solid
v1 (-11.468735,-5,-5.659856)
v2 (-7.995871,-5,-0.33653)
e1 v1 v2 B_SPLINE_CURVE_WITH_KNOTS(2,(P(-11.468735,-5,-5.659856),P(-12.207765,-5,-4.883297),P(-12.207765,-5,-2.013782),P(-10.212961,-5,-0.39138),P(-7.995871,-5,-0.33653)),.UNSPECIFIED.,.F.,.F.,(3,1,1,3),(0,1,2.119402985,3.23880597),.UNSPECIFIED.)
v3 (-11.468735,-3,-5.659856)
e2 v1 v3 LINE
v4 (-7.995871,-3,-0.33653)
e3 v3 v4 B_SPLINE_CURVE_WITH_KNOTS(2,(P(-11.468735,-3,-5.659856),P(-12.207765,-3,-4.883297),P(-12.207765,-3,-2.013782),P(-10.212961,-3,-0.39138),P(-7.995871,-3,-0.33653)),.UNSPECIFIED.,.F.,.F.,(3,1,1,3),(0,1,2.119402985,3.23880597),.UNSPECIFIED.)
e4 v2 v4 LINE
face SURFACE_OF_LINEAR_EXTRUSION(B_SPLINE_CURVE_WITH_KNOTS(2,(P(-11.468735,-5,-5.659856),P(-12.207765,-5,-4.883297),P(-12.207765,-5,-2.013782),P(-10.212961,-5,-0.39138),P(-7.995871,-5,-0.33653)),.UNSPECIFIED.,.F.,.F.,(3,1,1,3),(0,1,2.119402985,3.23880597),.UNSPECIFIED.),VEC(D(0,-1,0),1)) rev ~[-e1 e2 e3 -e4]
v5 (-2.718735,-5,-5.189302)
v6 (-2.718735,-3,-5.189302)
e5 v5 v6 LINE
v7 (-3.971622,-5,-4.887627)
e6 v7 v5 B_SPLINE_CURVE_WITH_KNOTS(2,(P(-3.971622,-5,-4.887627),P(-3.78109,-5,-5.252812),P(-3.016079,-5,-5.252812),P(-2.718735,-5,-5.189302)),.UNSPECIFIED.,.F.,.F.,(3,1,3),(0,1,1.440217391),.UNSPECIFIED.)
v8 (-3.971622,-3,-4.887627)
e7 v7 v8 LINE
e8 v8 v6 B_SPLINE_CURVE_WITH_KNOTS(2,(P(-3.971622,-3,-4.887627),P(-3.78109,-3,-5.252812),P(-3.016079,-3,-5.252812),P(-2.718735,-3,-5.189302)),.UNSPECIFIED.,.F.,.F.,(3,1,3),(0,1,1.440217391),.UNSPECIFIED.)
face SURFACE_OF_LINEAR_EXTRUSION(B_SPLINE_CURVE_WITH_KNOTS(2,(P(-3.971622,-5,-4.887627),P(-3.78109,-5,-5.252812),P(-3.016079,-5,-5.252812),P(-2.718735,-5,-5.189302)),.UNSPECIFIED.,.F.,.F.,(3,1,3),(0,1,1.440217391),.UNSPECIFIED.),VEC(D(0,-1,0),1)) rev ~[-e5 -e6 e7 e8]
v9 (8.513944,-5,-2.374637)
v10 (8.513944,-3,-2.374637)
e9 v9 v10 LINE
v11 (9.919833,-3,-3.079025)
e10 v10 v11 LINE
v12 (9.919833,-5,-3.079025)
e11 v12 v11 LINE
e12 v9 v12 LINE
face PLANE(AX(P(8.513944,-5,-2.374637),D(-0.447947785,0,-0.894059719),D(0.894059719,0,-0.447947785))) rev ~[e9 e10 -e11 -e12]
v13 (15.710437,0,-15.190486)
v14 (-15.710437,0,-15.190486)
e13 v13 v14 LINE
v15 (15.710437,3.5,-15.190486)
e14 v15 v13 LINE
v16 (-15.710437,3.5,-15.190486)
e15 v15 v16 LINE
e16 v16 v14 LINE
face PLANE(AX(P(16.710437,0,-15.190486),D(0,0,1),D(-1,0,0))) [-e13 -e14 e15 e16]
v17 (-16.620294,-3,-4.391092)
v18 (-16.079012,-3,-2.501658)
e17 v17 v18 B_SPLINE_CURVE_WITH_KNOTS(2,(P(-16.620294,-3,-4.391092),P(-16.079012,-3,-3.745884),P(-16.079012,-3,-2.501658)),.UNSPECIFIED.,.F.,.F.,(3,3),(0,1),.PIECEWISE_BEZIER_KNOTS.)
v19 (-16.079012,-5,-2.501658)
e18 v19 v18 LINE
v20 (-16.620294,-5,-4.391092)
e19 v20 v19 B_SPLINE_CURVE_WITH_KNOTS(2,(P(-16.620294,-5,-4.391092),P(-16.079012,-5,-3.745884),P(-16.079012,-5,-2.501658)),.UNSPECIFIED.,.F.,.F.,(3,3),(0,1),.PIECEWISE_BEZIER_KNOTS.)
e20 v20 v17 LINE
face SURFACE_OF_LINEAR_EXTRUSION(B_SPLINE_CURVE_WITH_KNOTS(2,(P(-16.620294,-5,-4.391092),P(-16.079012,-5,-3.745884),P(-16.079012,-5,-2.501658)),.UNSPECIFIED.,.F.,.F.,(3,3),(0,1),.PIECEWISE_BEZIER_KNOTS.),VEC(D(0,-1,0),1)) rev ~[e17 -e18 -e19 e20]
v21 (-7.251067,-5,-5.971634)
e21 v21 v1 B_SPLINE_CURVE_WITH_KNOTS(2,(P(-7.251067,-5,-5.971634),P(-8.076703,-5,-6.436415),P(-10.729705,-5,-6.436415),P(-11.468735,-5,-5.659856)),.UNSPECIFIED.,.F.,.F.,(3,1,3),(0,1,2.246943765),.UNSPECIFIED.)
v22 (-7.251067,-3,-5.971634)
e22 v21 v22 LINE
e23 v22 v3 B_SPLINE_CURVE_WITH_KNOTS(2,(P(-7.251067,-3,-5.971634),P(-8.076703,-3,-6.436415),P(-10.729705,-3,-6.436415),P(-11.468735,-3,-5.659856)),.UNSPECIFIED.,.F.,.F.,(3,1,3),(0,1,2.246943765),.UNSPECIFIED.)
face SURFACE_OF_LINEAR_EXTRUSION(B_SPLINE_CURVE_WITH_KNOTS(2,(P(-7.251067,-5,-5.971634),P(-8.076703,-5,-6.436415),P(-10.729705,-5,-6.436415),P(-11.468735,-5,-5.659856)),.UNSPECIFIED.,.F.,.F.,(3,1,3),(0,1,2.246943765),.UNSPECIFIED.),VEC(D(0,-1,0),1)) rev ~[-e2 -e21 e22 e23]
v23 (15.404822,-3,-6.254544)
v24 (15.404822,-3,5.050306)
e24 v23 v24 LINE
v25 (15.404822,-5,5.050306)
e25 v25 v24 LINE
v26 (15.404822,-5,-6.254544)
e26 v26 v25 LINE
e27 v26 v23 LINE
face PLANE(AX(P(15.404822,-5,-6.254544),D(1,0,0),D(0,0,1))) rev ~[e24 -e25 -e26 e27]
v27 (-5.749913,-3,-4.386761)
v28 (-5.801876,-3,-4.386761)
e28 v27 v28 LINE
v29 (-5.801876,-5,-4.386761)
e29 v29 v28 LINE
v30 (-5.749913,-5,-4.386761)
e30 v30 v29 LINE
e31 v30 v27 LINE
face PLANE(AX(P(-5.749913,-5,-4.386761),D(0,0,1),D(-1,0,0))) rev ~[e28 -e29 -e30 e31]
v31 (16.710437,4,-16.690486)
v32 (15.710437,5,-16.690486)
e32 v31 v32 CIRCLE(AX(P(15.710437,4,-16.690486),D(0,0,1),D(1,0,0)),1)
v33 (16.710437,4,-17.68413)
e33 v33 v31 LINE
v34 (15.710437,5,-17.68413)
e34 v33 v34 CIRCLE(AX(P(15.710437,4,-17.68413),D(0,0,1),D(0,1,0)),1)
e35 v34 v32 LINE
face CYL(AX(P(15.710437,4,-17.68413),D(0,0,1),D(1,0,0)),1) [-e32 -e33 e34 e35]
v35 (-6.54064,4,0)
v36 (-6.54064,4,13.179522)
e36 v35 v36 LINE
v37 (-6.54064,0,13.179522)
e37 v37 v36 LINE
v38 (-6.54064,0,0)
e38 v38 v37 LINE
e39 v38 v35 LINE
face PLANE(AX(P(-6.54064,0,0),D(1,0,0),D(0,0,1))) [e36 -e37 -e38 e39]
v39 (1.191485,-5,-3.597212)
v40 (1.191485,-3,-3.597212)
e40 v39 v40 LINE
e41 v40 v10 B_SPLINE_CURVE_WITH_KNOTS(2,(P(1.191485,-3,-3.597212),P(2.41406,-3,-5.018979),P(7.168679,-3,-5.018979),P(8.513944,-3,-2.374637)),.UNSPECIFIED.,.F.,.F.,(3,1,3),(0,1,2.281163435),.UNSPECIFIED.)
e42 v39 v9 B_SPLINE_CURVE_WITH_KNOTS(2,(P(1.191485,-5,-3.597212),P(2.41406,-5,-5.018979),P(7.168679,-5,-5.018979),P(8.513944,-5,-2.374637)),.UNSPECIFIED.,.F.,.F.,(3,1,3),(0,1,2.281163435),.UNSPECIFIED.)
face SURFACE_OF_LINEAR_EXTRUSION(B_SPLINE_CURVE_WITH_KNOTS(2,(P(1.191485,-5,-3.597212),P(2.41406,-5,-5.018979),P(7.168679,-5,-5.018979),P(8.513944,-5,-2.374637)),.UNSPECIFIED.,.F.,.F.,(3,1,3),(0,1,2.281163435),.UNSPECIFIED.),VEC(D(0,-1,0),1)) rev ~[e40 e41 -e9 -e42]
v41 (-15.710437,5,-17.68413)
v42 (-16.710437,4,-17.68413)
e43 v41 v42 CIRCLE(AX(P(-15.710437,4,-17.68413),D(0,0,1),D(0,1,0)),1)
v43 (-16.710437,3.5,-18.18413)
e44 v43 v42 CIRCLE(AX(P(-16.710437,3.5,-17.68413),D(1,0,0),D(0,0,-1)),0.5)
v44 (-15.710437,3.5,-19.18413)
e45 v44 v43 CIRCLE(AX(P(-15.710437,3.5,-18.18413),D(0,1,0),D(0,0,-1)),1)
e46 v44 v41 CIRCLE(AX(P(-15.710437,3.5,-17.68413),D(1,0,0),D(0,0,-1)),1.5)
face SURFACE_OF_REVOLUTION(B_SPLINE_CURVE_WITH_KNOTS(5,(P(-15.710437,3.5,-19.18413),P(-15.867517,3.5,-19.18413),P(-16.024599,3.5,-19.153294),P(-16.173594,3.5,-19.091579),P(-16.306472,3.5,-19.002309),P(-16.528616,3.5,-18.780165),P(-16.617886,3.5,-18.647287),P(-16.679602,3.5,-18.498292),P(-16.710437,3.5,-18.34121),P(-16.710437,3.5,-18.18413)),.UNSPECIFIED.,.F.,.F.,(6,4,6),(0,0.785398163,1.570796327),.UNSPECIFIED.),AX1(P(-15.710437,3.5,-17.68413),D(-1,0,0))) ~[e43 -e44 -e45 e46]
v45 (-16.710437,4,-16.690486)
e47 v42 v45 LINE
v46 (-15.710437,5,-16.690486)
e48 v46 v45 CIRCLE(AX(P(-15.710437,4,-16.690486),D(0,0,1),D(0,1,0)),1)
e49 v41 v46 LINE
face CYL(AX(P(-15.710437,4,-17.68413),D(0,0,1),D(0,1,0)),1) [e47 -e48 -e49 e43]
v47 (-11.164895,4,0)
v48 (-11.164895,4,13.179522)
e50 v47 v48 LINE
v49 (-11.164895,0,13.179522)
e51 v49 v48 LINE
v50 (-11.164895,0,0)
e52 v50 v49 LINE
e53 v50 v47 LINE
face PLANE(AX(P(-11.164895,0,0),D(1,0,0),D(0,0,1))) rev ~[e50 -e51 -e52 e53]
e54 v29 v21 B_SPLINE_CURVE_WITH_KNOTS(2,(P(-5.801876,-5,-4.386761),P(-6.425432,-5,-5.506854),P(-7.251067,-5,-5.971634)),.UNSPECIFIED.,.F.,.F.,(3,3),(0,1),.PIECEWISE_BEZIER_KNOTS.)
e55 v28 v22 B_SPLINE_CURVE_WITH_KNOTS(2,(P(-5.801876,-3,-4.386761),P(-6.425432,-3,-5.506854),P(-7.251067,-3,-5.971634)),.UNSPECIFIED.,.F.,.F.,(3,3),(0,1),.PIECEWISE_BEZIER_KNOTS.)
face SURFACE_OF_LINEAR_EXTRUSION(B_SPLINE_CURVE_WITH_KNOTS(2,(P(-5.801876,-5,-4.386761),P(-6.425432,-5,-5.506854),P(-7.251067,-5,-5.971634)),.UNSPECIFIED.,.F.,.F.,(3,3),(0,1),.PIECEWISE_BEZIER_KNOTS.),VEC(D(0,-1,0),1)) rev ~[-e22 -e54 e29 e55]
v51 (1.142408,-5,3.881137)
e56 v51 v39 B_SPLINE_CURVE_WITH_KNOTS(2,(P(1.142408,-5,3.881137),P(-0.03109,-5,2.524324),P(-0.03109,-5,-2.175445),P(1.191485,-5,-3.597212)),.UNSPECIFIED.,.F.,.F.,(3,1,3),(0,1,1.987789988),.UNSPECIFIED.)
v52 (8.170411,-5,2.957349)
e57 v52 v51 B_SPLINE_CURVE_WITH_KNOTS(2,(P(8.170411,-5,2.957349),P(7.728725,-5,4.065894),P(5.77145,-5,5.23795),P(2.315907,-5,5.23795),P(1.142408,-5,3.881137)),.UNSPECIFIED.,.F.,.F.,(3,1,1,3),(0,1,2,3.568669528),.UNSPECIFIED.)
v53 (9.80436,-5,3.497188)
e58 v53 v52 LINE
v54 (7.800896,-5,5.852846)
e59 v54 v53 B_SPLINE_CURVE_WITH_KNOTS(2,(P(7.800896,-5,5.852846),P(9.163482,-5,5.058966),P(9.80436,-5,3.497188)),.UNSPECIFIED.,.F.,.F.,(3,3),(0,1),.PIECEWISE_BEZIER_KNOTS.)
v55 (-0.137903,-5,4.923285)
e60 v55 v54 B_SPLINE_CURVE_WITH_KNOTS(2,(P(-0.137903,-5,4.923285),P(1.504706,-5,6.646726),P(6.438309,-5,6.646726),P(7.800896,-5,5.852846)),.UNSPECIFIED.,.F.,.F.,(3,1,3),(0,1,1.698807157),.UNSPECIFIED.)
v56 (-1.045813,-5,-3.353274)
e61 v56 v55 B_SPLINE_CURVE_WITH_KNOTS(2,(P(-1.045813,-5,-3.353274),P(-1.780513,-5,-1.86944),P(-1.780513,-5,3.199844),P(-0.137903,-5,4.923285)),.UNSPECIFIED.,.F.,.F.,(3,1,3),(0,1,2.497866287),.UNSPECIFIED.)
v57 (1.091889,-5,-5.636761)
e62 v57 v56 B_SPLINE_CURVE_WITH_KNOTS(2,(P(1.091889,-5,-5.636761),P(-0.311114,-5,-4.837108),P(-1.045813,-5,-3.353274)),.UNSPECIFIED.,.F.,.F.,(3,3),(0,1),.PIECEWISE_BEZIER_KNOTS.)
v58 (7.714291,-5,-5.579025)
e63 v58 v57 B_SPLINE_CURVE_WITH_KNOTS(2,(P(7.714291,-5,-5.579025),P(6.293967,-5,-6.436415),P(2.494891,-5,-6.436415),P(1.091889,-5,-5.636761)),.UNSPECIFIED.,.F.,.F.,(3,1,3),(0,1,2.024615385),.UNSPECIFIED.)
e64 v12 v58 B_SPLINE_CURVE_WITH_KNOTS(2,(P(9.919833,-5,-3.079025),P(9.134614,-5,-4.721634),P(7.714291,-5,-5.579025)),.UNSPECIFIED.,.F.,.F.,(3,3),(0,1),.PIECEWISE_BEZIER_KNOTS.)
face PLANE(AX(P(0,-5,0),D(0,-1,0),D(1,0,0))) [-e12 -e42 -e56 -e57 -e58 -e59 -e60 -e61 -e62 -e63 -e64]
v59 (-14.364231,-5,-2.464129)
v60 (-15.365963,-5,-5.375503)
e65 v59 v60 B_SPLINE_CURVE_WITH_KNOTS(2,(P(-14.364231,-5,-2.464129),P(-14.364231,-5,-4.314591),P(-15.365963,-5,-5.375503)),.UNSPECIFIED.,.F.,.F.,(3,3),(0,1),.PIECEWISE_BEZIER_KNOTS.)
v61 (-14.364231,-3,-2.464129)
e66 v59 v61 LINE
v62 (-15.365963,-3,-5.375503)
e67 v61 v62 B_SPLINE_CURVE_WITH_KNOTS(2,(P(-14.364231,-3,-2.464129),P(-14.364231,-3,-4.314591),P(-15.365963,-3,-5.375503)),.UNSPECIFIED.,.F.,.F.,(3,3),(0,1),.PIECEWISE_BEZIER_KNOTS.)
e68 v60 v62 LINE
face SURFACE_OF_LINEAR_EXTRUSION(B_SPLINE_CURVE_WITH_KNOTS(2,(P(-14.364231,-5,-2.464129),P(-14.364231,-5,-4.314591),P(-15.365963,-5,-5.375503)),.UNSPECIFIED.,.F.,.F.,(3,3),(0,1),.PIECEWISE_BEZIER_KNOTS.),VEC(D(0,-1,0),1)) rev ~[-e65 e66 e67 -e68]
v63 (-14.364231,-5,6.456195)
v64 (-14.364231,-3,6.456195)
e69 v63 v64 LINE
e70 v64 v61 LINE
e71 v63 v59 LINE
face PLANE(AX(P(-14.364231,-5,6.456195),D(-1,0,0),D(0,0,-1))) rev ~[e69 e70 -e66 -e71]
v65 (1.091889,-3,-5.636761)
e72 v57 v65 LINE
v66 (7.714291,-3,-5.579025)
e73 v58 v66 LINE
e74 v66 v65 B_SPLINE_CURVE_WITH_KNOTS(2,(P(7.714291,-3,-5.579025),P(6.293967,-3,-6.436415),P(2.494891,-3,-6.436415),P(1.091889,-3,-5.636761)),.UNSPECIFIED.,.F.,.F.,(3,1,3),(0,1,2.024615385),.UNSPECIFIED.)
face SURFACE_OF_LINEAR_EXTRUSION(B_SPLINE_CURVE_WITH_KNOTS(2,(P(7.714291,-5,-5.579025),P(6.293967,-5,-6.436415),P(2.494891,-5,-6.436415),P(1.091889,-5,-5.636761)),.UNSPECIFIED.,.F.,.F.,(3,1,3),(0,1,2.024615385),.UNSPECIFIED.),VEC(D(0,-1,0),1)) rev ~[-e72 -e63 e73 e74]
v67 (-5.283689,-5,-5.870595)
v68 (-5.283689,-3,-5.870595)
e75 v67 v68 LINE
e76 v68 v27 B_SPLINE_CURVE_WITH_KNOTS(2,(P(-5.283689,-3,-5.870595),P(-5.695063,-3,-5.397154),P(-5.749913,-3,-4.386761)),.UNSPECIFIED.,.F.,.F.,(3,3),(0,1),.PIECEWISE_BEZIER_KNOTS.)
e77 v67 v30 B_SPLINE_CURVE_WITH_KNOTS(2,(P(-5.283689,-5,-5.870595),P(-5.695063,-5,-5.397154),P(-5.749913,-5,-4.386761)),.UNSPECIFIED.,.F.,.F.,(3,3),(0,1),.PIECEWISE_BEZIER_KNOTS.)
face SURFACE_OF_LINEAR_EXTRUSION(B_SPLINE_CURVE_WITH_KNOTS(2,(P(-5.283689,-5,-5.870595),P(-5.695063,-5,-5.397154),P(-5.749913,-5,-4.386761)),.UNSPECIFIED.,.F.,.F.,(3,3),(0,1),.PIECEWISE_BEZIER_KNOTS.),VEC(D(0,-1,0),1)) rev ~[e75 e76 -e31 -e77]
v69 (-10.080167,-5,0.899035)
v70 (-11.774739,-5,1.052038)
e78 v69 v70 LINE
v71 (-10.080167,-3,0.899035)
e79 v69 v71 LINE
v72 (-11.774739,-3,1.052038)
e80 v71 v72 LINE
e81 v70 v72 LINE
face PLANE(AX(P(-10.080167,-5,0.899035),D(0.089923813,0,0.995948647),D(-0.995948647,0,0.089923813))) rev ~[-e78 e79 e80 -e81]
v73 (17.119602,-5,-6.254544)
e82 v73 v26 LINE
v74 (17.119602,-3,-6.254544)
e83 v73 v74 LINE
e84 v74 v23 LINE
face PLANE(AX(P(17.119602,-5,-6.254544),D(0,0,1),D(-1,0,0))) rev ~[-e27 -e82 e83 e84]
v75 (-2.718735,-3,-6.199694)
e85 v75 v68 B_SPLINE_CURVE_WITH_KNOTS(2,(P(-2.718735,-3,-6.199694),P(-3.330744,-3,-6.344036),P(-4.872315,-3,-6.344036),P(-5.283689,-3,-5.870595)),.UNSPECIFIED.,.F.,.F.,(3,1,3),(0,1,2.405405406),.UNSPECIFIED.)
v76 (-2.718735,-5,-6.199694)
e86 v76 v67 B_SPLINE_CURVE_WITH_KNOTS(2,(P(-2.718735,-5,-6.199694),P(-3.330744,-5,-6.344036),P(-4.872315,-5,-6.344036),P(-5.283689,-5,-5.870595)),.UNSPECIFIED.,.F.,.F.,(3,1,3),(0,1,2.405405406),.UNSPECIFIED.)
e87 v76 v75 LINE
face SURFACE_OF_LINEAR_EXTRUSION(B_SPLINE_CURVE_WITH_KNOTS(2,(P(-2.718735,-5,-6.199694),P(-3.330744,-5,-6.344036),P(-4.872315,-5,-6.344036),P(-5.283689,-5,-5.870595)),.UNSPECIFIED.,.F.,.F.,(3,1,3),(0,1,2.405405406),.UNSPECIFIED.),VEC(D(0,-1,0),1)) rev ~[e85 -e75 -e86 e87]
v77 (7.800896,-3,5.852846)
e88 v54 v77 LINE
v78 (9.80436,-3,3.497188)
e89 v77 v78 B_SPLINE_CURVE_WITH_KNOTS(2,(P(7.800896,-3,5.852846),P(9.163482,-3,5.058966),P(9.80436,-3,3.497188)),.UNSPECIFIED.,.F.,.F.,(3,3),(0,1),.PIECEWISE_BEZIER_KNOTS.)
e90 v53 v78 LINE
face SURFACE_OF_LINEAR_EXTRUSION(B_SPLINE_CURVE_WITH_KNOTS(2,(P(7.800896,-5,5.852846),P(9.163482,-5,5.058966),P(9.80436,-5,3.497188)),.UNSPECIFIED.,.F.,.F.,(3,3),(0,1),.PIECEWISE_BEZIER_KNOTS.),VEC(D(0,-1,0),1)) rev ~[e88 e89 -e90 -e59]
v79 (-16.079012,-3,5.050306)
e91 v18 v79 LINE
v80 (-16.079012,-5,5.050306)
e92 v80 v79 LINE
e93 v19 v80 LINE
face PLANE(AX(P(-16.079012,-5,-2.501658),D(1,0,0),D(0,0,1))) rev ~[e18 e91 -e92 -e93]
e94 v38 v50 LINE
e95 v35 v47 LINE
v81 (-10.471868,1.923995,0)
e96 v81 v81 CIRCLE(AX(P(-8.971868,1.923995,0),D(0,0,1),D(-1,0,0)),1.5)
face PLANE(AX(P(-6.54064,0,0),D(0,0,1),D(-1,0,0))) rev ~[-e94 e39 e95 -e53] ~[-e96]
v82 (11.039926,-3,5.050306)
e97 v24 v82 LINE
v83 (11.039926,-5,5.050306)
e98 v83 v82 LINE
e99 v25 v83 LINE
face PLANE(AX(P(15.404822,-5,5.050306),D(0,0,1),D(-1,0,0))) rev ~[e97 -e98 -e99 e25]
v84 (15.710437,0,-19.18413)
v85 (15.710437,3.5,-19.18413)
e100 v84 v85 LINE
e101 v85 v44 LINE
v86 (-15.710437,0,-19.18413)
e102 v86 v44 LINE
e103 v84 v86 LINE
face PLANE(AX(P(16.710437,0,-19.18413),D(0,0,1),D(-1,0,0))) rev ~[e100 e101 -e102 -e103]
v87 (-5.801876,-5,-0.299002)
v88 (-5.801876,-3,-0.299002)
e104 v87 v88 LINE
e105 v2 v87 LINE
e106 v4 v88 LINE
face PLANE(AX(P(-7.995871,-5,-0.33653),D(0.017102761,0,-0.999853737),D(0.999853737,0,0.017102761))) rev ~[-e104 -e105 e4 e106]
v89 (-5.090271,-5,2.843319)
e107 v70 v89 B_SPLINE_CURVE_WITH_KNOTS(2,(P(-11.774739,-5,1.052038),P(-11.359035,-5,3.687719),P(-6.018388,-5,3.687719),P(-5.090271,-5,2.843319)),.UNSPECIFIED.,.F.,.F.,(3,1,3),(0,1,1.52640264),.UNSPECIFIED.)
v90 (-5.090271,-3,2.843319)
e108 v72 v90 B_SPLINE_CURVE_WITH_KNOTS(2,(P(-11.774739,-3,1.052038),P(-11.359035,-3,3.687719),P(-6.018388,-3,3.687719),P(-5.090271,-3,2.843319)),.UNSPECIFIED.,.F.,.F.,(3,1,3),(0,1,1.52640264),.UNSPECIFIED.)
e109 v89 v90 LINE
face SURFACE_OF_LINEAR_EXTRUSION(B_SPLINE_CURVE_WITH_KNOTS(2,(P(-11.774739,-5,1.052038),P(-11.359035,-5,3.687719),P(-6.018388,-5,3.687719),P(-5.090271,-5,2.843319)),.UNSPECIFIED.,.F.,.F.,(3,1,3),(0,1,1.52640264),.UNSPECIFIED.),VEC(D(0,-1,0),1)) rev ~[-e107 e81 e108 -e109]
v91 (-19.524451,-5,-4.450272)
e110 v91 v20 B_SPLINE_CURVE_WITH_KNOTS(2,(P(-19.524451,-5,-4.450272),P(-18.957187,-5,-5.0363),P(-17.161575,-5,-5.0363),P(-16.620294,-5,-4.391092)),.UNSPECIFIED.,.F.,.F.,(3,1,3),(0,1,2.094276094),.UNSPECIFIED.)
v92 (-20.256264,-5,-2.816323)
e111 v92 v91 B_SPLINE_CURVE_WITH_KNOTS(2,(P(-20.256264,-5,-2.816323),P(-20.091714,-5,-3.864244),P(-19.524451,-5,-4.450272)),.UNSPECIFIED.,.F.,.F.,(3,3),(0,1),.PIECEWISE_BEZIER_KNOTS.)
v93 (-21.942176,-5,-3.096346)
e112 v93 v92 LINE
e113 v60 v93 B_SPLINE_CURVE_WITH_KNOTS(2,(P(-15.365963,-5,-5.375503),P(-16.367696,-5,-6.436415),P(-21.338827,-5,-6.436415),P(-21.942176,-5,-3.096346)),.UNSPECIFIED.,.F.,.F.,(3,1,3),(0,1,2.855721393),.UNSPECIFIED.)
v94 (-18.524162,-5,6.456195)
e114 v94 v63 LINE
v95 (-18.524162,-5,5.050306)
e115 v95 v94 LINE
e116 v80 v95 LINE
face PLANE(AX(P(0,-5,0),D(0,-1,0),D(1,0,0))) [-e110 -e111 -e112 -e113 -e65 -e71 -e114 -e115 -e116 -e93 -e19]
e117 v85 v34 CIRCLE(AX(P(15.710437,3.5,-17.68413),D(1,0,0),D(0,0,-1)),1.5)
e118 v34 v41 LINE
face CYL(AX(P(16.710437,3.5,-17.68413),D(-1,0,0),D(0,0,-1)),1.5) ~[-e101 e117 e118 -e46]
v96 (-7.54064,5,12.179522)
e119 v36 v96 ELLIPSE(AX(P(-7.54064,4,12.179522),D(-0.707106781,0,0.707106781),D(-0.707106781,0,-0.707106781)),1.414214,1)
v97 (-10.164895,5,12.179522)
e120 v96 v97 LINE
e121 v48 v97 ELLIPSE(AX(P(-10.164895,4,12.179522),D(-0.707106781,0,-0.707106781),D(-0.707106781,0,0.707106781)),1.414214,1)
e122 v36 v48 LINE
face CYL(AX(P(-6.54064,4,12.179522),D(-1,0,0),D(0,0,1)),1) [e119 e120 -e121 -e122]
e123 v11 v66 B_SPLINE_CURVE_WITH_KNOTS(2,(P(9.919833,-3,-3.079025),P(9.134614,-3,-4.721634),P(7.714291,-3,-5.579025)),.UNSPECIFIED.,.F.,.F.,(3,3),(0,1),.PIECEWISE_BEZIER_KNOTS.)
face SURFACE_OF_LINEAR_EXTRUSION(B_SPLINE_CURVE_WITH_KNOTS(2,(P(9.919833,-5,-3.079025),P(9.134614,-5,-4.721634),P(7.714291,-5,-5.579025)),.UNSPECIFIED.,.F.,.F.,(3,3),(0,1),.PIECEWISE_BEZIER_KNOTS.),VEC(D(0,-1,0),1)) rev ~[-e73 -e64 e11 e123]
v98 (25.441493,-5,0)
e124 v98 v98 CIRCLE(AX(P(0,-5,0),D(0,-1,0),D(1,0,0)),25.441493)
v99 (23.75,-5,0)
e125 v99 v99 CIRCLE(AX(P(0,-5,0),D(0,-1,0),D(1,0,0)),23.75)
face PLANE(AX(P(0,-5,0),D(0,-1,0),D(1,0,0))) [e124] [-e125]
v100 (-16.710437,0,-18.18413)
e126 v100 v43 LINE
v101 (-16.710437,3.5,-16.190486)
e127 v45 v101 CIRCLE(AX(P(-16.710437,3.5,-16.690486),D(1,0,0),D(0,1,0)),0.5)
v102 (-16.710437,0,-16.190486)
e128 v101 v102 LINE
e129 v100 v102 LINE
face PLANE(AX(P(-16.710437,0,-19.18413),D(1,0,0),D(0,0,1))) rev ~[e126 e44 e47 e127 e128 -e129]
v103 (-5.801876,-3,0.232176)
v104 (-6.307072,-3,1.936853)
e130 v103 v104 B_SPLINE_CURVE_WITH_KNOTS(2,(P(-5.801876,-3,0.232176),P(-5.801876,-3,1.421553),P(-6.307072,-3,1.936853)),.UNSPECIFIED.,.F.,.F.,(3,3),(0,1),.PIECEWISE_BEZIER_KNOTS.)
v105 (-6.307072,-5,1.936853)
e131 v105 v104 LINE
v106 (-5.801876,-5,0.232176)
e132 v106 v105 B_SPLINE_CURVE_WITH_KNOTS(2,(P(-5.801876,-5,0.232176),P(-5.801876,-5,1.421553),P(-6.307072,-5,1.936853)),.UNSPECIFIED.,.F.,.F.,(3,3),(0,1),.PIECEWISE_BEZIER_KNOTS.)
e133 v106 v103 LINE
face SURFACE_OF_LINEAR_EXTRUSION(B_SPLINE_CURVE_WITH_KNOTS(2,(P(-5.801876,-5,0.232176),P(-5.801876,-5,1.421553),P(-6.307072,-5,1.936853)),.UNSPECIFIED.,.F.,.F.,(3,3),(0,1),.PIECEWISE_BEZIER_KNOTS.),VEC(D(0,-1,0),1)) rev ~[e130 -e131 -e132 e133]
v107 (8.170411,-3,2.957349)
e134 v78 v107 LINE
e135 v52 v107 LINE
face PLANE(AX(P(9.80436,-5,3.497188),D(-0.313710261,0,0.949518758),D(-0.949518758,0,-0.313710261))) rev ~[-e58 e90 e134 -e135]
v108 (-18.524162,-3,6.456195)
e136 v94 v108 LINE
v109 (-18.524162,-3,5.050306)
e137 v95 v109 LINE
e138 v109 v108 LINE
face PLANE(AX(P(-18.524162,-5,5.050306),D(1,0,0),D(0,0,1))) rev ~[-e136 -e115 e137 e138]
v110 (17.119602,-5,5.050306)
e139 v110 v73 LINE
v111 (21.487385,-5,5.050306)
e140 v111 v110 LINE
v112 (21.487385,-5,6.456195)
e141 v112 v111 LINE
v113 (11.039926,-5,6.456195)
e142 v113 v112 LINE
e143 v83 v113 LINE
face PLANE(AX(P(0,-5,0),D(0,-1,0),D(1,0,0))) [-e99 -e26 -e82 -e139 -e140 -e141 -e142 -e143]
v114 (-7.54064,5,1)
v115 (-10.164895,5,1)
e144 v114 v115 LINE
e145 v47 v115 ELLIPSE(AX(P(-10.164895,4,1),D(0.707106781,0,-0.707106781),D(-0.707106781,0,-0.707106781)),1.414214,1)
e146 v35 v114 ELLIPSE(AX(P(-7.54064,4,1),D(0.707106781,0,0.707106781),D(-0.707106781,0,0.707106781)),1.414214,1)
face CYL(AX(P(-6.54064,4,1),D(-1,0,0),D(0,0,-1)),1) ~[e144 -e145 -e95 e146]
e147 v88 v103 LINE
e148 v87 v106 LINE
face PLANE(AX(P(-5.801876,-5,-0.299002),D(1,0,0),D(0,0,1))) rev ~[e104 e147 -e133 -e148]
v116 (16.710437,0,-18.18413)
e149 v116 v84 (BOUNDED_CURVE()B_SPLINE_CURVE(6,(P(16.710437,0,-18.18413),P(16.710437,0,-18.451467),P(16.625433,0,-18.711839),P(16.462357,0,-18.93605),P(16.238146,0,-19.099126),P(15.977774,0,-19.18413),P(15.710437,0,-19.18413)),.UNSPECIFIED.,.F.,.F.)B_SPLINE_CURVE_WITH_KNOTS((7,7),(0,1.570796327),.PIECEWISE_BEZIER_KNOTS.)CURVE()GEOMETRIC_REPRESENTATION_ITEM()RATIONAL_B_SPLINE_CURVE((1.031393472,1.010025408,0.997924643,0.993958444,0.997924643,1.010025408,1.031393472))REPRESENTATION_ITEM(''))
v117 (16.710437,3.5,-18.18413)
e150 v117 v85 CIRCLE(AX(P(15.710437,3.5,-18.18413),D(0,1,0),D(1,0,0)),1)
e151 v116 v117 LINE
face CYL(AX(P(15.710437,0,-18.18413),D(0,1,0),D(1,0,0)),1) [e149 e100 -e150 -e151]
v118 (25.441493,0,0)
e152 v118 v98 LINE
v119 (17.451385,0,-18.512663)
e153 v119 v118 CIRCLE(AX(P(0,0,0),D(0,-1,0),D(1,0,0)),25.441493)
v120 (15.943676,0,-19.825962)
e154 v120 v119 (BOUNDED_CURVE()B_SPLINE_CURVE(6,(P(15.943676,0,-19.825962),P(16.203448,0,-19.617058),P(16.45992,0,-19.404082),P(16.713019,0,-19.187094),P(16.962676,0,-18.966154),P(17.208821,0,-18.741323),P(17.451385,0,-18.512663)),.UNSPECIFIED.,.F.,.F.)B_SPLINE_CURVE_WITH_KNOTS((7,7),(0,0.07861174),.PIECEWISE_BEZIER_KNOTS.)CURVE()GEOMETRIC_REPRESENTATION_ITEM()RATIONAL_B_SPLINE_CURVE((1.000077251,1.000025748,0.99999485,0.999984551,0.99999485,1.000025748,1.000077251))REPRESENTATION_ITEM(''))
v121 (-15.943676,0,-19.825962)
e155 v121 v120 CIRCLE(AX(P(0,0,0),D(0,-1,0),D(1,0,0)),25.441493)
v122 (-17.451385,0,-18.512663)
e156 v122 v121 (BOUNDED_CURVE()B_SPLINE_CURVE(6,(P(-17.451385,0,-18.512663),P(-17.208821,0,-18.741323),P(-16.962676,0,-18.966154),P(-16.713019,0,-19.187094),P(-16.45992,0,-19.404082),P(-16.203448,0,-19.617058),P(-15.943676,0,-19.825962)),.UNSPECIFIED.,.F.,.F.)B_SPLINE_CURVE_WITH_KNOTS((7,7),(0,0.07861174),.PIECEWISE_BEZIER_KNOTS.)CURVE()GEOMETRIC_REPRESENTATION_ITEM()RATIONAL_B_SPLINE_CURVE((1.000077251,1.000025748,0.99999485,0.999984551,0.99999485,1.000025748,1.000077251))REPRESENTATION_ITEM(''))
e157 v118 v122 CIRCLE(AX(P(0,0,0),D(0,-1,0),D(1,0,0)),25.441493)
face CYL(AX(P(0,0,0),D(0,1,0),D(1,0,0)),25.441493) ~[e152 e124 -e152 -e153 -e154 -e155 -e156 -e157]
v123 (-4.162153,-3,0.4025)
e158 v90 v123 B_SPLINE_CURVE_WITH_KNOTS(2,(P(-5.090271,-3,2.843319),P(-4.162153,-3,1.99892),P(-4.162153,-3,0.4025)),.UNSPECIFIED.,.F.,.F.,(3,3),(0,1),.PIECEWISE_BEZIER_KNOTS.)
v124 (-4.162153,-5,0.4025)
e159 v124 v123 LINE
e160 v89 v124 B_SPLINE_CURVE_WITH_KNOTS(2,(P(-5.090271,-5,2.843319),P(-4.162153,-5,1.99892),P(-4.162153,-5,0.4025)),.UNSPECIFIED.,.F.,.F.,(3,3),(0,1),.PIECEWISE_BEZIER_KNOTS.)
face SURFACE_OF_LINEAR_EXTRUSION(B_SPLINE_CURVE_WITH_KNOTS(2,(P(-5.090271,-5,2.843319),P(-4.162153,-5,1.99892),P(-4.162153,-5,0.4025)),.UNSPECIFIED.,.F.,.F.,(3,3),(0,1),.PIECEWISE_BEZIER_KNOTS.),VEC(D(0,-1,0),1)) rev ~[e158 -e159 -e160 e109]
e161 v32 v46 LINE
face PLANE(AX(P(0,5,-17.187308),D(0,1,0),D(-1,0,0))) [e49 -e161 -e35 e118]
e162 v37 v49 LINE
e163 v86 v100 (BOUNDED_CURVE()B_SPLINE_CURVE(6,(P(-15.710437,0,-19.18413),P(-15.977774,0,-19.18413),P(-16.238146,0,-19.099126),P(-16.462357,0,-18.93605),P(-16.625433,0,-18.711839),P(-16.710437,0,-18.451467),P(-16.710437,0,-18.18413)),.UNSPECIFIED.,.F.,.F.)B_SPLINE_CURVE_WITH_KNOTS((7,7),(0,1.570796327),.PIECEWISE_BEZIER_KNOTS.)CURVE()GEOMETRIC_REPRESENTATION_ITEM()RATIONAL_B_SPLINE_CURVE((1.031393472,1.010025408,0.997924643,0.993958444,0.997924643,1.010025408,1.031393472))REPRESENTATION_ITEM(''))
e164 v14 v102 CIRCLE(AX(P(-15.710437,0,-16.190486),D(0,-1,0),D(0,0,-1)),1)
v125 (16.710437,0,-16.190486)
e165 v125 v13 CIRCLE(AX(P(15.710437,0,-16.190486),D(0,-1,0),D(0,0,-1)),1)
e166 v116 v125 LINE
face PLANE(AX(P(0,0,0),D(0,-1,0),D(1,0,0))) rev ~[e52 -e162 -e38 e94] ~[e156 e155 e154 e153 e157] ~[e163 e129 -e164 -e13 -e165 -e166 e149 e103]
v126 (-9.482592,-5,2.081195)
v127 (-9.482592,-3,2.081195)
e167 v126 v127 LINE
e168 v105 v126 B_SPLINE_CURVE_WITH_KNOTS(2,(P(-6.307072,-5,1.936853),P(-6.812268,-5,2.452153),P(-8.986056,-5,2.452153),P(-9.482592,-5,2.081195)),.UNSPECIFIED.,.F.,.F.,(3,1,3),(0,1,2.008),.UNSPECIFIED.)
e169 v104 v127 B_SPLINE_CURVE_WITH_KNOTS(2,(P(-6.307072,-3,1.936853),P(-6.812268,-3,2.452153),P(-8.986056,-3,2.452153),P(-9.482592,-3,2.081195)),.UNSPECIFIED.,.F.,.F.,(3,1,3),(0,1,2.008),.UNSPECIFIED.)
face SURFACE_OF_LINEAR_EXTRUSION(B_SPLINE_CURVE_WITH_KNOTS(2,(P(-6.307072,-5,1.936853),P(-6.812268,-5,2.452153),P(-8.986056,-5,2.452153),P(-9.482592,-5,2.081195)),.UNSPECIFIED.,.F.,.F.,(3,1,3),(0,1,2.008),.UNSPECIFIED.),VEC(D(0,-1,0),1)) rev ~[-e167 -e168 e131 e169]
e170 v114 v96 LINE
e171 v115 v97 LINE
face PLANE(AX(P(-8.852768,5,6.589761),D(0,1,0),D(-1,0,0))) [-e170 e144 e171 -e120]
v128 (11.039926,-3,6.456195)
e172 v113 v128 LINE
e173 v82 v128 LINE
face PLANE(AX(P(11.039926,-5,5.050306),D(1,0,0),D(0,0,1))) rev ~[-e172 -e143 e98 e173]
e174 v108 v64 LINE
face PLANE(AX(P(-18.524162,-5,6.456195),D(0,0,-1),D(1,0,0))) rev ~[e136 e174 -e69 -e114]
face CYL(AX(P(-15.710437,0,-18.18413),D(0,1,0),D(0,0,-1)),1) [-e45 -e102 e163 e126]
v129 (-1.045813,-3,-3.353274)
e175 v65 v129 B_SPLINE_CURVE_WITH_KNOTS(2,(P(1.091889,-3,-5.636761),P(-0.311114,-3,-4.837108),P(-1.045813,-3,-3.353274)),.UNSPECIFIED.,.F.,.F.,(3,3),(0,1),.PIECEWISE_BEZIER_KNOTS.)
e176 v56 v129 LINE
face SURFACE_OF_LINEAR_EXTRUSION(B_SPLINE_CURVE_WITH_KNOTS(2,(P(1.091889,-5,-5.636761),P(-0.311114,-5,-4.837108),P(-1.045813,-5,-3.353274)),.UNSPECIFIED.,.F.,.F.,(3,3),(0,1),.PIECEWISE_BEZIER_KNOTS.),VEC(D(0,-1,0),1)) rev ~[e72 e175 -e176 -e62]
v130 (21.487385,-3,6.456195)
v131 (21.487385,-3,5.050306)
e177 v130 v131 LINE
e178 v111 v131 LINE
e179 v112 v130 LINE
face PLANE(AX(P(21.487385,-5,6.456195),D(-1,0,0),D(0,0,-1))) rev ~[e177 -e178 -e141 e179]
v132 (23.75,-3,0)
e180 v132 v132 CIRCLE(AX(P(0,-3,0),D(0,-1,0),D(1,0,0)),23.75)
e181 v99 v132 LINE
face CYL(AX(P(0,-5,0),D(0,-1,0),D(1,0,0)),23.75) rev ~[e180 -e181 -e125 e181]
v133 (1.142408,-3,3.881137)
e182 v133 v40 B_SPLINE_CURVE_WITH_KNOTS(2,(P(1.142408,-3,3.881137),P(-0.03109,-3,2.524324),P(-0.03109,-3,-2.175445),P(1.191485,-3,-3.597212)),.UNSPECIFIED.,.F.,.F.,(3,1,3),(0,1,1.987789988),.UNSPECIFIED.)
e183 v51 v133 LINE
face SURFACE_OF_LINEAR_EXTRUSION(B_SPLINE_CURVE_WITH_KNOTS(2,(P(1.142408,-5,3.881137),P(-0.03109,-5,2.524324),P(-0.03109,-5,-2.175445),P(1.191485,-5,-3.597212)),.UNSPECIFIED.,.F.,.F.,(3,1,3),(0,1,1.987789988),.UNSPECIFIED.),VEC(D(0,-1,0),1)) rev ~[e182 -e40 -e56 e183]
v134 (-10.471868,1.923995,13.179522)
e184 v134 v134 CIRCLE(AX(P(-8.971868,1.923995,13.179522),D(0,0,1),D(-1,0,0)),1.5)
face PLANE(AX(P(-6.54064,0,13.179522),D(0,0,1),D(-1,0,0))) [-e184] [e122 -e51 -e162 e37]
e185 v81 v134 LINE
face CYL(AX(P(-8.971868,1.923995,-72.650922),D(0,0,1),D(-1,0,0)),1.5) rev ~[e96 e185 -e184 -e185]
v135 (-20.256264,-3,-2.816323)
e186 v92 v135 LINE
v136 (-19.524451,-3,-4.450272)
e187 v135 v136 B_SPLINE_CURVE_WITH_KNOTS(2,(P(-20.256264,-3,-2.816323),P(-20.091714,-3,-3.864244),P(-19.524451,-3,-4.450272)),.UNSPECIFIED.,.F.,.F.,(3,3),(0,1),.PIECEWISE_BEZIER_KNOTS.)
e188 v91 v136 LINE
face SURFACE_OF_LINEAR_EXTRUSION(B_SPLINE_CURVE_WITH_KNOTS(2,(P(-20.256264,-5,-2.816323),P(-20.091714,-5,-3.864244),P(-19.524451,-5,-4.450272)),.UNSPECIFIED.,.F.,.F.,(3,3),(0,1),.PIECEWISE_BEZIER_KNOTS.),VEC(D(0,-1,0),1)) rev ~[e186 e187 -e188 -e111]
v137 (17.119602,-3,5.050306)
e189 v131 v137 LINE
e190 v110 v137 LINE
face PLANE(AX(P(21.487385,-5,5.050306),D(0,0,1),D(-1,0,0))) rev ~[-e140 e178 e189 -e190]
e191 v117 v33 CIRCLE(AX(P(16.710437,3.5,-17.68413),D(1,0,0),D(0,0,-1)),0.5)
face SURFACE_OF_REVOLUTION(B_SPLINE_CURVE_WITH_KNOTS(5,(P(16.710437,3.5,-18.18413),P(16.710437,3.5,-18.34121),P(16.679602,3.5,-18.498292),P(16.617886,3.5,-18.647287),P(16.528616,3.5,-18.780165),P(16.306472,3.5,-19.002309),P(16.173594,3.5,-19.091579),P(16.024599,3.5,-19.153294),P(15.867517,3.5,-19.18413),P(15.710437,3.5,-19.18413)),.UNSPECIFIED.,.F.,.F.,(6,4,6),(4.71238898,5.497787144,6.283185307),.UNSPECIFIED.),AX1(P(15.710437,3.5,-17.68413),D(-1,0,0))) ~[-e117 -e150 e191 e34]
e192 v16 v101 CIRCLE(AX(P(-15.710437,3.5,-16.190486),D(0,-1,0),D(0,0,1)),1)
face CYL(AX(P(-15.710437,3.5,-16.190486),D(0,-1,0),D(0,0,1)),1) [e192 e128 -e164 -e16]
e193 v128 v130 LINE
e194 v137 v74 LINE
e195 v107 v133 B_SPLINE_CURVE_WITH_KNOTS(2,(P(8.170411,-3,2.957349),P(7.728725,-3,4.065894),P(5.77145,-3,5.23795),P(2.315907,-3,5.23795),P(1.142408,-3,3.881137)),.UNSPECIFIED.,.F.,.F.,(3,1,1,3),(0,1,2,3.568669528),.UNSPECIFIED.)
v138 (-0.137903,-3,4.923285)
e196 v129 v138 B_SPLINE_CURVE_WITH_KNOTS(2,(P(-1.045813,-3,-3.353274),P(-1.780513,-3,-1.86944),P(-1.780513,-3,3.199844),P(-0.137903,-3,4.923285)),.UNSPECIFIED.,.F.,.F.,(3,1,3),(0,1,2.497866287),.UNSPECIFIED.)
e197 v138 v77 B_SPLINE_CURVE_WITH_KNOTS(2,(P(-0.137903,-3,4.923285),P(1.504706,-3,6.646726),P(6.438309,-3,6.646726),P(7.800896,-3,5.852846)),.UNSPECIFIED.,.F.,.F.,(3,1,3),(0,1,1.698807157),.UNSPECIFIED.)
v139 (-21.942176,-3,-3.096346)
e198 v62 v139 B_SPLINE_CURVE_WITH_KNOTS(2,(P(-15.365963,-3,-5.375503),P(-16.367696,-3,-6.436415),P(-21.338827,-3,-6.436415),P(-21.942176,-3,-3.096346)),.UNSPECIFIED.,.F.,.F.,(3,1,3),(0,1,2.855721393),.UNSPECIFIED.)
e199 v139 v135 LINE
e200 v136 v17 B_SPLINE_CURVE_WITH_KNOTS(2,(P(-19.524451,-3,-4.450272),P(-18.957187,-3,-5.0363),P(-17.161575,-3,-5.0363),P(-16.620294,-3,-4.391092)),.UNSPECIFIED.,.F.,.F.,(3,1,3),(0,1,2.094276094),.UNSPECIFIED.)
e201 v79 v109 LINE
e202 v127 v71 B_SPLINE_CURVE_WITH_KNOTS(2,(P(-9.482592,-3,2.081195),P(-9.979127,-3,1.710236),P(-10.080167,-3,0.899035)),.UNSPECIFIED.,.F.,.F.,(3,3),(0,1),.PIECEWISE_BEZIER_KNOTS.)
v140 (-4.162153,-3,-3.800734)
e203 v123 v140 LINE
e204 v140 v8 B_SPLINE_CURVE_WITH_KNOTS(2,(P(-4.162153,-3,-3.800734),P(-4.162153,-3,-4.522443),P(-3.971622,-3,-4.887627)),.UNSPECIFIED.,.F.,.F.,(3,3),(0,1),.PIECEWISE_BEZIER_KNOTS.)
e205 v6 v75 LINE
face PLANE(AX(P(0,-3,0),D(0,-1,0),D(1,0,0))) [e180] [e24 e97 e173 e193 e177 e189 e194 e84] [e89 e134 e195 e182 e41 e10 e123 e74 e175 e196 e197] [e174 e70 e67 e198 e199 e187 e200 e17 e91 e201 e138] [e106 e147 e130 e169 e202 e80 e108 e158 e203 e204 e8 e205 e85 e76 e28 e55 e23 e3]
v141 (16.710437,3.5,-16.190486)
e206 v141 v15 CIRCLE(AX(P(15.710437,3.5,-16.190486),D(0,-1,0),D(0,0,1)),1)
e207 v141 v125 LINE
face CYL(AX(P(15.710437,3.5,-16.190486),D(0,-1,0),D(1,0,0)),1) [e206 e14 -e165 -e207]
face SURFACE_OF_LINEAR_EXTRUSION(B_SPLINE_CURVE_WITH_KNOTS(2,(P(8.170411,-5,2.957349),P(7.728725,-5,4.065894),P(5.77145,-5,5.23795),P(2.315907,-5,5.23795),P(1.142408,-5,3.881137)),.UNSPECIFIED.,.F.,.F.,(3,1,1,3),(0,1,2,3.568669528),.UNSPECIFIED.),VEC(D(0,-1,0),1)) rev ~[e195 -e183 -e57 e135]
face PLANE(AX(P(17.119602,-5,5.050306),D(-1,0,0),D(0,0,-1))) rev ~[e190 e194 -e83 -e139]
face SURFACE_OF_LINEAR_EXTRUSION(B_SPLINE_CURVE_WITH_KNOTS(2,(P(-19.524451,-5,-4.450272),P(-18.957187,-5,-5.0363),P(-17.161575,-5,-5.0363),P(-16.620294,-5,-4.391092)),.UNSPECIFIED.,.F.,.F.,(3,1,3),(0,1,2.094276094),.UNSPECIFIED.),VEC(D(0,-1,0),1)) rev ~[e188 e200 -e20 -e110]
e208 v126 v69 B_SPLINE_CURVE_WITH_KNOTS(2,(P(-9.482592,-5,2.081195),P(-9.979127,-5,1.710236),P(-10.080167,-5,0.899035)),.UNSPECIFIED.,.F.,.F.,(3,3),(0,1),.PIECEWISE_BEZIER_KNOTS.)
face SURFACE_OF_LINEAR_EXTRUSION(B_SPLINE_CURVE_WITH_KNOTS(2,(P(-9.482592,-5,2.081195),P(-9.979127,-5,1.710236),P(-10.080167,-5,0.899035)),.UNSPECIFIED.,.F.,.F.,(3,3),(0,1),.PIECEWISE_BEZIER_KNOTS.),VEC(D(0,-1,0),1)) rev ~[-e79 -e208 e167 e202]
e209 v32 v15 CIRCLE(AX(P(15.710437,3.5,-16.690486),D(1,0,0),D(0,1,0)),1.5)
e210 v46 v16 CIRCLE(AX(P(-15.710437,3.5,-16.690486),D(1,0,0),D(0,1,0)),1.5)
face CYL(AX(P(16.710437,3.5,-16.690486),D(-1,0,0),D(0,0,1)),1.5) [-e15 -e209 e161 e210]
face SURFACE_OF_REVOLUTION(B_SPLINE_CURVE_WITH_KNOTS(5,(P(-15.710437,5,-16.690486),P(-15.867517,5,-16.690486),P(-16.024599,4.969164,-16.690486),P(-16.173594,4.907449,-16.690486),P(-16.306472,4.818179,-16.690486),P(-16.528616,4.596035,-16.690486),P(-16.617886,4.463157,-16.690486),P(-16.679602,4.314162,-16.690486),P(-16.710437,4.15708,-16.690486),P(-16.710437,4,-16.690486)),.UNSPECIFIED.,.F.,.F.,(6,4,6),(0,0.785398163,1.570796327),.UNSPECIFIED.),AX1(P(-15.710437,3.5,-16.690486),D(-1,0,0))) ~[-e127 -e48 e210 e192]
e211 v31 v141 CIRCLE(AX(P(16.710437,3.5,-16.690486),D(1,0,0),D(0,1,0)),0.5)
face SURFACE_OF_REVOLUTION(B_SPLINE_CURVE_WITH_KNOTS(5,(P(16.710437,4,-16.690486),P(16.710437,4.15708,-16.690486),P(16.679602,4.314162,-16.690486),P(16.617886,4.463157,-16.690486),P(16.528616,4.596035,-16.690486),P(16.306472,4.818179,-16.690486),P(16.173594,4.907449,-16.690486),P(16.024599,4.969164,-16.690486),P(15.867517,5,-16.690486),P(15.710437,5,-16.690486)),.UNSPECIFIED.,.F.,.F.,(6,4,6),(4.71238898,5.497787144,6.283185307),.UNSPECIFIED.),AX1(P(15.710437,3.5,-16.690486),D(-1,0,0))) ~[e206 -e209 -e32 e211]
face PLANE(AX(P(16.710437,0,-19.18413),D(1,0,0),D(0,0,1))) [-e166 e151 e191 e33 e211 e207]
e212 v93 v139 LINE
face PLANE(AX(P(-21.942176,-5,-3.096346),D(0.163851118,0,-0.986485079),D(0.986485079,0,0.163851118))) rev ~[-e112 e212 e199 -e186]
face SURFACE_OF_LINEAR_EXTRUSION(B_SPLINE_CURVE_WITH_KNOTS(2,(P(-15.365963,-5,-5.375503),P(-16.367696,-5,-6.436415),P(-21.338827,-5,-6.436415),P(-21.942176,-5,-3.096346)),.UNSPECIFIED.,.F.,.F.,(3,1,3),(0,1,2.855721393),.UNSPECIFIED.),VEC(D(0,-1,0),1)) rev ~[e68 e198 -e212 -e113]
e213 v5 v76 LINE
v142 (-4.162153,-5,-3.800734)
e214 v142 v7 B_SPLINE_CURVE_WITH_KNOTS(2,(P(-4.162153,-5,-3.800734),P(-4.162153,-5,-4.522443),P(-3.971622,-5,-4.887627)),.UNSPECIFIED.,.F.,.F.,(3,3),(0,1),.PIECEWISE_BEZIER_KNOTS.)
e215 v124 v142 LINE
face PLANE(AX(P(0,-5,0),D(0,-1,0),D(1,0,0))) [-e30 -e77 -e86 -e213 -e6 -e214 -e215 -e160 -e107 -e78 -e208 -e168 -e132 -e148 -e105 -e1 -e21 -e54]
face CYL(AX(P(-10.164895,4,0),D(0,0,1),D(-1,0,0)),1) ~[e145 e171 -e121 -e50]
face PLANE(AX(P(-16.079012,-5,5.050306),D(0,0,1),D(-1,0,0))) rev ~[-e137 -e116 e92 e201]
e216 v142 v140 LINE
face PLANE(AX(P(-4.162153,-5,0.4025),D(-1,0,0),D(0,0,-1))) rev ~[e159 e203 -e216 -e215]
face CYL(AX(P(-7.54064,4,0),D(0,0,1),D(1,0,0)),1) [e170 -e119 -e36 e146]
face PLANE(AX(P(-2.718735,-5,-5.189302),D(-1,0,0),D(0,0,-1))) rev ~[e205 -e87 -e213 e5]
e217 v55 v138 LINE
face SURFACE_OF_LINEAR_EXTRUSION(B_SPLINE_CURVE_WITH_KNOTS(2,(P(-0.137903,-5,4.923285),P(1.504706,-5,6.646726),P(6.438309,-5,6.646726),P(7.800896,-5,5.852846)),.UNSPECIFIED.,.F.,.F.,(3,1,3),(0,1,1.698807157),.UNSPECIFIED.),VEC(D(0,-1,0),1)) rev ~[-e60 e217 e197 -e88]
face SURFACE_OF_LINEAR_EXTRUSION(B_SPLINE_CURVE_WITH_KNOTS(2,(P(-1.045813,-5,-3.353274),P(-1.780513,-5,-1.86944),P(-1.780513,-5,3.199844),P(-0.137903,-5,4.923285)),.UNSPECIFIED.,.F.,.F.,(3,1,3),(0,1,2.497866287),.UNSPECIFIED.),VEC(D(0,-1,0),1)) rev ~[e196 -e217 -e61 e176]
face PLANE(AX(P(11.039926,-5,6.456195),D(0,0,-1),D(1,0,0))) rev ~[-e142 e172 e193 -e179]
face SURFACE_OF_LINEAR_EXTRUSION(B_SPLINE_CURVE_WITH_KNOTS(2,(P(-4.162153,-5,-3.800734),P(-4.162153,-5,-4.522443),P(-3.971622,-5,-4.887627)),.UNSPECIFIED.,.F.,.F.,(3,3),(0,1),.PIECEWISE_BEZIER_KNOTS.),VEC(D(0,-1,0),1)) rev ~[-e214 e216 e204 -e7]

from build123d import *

# Parameters (mm, degrees)
F0_R      = 25.4414928825
F1_DEPTH  = 5
F2_R      = 23.75
F3_DEPTH  = 2
F4_W      = 4.6242554672
F4_H      = 13.1795220077
F5_DEPTH  = 5
F6_R      = 1
F8_D      = 3
F9_W      = 33.4208746554
F9_H      = 3.9936437383
F10_DEPTH = 5
F11_R     = 1.5
F12_R     = 1


with BuildPart() as f1:
    # F0 (on Front) → F1 (new body)
    with BuildSketch(Plane.XZ):
        Circle(F0_R)
    extrude(amount=F1_DEPTH)

    # F2 (on face) → F3 (cut)
    with BuildSketch(Plane.XZ.offset(5)):
        Circle(F2_R)
        with BuildLine():
            add(Edge.make_bspline(
                [(-7.2510674036, -5.9716344181), (-8.0767025075, -6.4364150185), (-9.2574184429, -6.4364150185)],
                knots=[0, 0, 0, 1, 1, 1], degree=2))
            add(Edge.make_bspline(
                [(-9.2574184429, -6.4364150185), (-10.729704817, -6.4364150185), (-11.4687348401, -5.6598561271)],
                knots=[0, 0, 0, 1, 1, 1], degree=2))
            add(Edge.make_bspline(
                [(-11.4687348401, -5.6598561271), (-12.2077648632, -4.8832972356), (-12.2077648632, -3.5293711386)],
                knots=[0, 0, 0, 1, 1, 1], degree=2))
            add(Edge.make_bspline(
                [(-12.2077648632, -3.5293711386), (-12.2077648632, -2.0137822241), (-11.2103630156, -1.2025813003)],
                knots=[0, 0, 0, 1, 1, 1], degree=2))
            add(Edge.make_bspline(
                [(-11.2103630156, -1.2025813003), (-10.212961168, -0.3913803765), (-7.9958710988, -0.336530492)],
                knots=[0, 0, 0, 1, 1, 1], degree=2))
            Line((-7.9958710988, -0.336530492), (-5.8018757177, -0.2990016236))
            Line((-5.8018757177, -0.2990016236), (-5.8018757177, 0.2321762055))
            add(Edge.make_bspline(
                [(-5.8018757177, 0.2321762055), (-5.8018757177, 1.4215526489), (-6.3070720225, 1.9368528798)],
                knots=[0, 0, 0, 1, 1, 1], degree=2))
            add(Edge.make_bspline(
                [(-6.3070720225, 1.9368528798), (-6.8122683274, 2.4521531108), (-7.8948318378, 2.4521531108)],
                knots=[0, 0, 0, 1, 1, 1], degree=2))
            add(Edge.make_bspline(
                [(-7.8948318378, 2.4521531108), (-8.9860558563, 2.4521531108), (-9.482591653, 2.0811946812)],
                knots=[0, 0, 0, 1, 1, 1], degree=2))
            add(Edge.make_bspline(
                [(-9.482591653, 2.0811946812), (-9.9791274498, 1.7102362517), (-10.0801667108, 0.8990353279)],
                knots=[0, 0, 0, 1, 1, 1], degree=2))
            Line((-10.0801667108, 0.8990353279), (-11.774739459, 1.0520376373))
            add(Edge.make_bspline(
                [(-11.774739459, 1.0520376373), (-11.359035071, 3.6877189307), (-7.8601898055, 3.6877189307)],
                knots=[0, 0, 0, 1, 1, 1], degree=2))
            add(Edge.make_bspline(
                [(-7.8601898055, 3.6877189307), (-6.0183884198, 3.6877189307), (-5.0902706369, 2.8433193925)],
                knots=[0, 0, 0, 1, 1, 1], degree=2))
            add(Edge.make_bspline(
                [(-5.0902706369, 2.8433193925), (-4.162152854, 1.9989198544), (-4.162152854, 0.4024995311)],
                knots=[0, 0, 0, 1, 1, 1], degree=2))
            Line((-4.162152854, 0.4024995311), (-4.162152854, -3.8007337252))
            add(Edge.make_bspline(
                [(-4.162152854, -3.8007337252), (-4.162152854, -4.5224427322), (-3.9716216761, -4.8876274897)],
                knots=[0, 0, 0, 1, 1, 1], degree=2))
            add(Edge.make_bspline(
                [(-3.9716216761, -4.8876274897), (-3.7810904983, -5.2528122472), (-3.2499126692, -5.2528122472)],
                knots=[0, 0, 0, 1, 1, 1], degree=2))
            add(Edge.make_bspline(
                [(-3.2499126692, -5.2528122472), (-3.016078951, -5.2528122472), (-2.7187348401, -5.1893018546)],
                knots=[0, 0, 0, 1, 1, 1], degree=2))
            Line((-2.7187348401, -5.1893018546), (-2.7187348401, -6.1996944643))
            add(Edge.make_bspline(
                [(-2.7187348401, -6.1996944643), (-3.330744078, -6.3440362657), (-3.9716216761, -6.3440362657)],
                knots=[0, 0, 0, 1, 1, 1], degree=2))
            add(Edge.make_bspline(
                [(-3.9716216761, -6.3440362657), (-4.8723145168, -6.3440362657), (-5.2836886507, -5.8705951571)],
                knots=[0, 0, 0, 1, 1, 1], degree=2))
            add(Edge.make_bspline(
                [(-5.2836886507, -5.8705951571), (-5.6950627847, -5.3971540486), (-5.7499126692, -4.3867614389)],
                knots=[0, 0, 0, 1, 1, 1], degree=2))
            Line((-5.7499126692, -4.3867614389), (-5.8018757177, -4.3867614389))
            add(Edge.make_bspline(
                [(-5.8018757177, -4.3867614389), (-6.4254322997, -5.5068538176), (-7.2510674036, -5.9716344181)],
                knots=[0, 0, 0, 1, 1, 1], degree=2))
        make_face(mode=Mode.SUBTRACT)
        with BuildLine():
            add(Edge.make_bspline(
                [(-15.3659634775, -5.3755027784), (-16.3676955791, -6.4364150185), (-18.1084577038, -6.4364150185)],
                knots=[0, 0, 0, 1, 1, 1], degree=2))
            add(Edge.make_bspline(
                [(-18.1084577038, -6.4364150185), (-21.3388272188, -6.4364150185), (-21.9421759486, -3.0963457345)],
                knots=[0, 0, 0, 1, 1, 1], degree=2))
            Line((-21.9421759486, -3.0963457345), (-20.2562637085, -2.8163226398))
            add(Edge.make_bspline(
                [(-20.2562637085, -2.8163226398), (-20.0917140549, -3.8642441178), (-19.5244507754, -4.4502718315)],
                knots=[0, 0, 0, 1, 1, 1], degree=2))
            add(Edge.make_bspline(
                [(-19.5244507754, -4.4502718315), (-18.957187496, -5.0362995451), (-18.0997971958, -5.0362995451)],
                knots=[0, 0, 0, 1, 1, 1], degree=2))
            add(Edge.make_bspline(
                [(-18.0997971958, -5.0362995451), (-17.1615754867, -5.0362995451), (-16.6202937316, -4.3910916929)],
                knots=[0, 0, 0, 1, 1, 1], degree=2))
            add(Edge.make_bspline(
                [(-16.6202937316, -4.3910916929), (-16.0790119764, -3.7458838407), (-16.0790119764, -2.5016575128)],
                knots=[0, 0, 0, 1, 1, 1], degree=2))
            Line((-16.0790119764, -2.5016575128), (-16.0790119764, 5.0503055357))
            Line((-16.0790119764, 5.0503055357), (-18.5241620918, 5.0503055357))
            Line((-18.5241620918, 5.0503055357), (-18.5241620918, 6.4561946812))
            Line((-18.5241620918, 6.4561946812), (-14.3642313759, 6.4561946812))
            Line((-14.3642313759, 6.4561946812), (-14.3642313759, -2.4641286444))
            add(Edge.make_bspline(
                [(-14.3642313759, -2.4641286444), (-14.3642313759, -4.3145905382), (-15.3659634775, -5.3755027784)],
                knots=[0, 0, 0, 1, 1, 1], degree=2))
        make_face(mode=Mode.SUBTRACT)
        with BuildLine():
            add(Edge.make_bspline(
                [(6.7500873308, 4.6519221639), (5.7714499174, 5.2379498775), (4.4261843285, 5.2379498775)],
                knots=[0, 0, 0, 1, 1, 1], degree=2))
            add(Edge.make_bspline(
                [(4.4261843285, 5.2379498775), (2.3159071922, 5.2379498775), (1.142408347, 3.8811369445)],
                knots=[0, 0, 0, 1, 1, 1], degree=2))
            add(Edge.make_bspline(
                [(1.142408347, 3.8811369445), (-0.0310904983, 2.5243240115), (-0.0310904983, 0.1600053048)],
                knots=[0, 0, 0, 1, 1, 1], degree=2))
            add(Edge.make_bspline(
                [(-0.0310904983, 0.1600053048), (-0.0310904983, -2.1754450416), (1.1914845594, -3.5972117853)],
                knots=[0, 0, 0, 1, 1, 1], degree=2))
            add(Edge.make_bspline(
                [(1.1914845594, -3.5972117853), (2.4140596172, -5.0189785289), (4.4983552292, -5.0189785289)],
                knots=[0, 0, 0, 1, 1, 1], degree=2))
            add(Edge.make_bspline(
                [(4.4983552292, -5.0189785289), (7.1686785548, -5.0189785289), (8.5139441437, -2.3746367275)],
                knots=[0, 0, 0, 1, 1, 1], degree=2))
            Line((8.5139441437, -2.3746367275), (9.9198332892, -3.0790247183))
            add(Edge.make_bspline(
                [(9.9198332892, -3.0790247183), (9.1346138897, -4.7216344181), (7.7142905641, -5.5790247183)],
                knots=[0, 0, 0, 1, 1, 1], degree=2))
            add(Edge.make_bspline(
                [(7.7142905641, -5.5790247183), (6.2939672384, -6.4364150185), (4.4175238204, -6.4364150185)],
                knots=[0, 0, 0, 1, 1, 1], degree=2))
            add(Edge.make_bspline(
                [(4.4175238204, -6.4364150185), (2.494891026, -6.4364150185), (1.0918887165, -5.6367614389)],
                knots=[0, 0, 0, 1, 1, 1], degree=2))
            add(Edge.make_bspline(
                [(1.0918887165, -5.6367614389), (-0.311113593, -4.8371078592), (-1.045813362, -3.3532741409)],
                knots=[0, 0, 0, 1, 1, 1], degree=2))
            add(Edge.make_bspline(
                [(-1.045813362, -3.3532741409), (-1.7805131311, -1.8694404227), (-1.7805131311, 0.1600053048)],
                knots=[0, 0, 0, 1, 1, 1], degree=2))
            add(Edge.make_bspline(
                [(-1.7805131311, 0.1600053048), (-1.7805131311, 3.199843642), (-0.1379034313, 4.9232847505)],
                knots=[0, 0, 0, 1, 1, 1], degree=2))
            add(Edge.make_bspline(
                [(-0.1379034313, 4.9232847505), (1.5047062684, 6.6467258591), (4.4088633123, 6.6467258591)],
                knots=[0, 0, 0, 1, 1, 1], degree=2))
            add(Edge.make_bspline(
                [(4.4088633123, 6.6467258591), (6.4383090398, 6.6467258591), (7.8008956449, 5.8528459514)],
                knots=[0, 0, 0, 1, 1, 1], degree=2))
            add(Edge.make_bspline(
                [(7.8008956449, 5.8528459514), (9.16348225, 5.0589660438), (9.8043598481, 3.4971877528)],
                knots=[0, 0, 0, 1, 1, 1], degree=2))
            Line((9.8043598481, 3.4971877528), (8.1704106564, 2.9573494156))
            add(Edge.make_bspline(
                [(8.1704106564, 2.9573494156), (7.7287247442, 4.0658944503), (6.7500873308, 4.6519221639)],
                knots=[0, 0, 0, 1, 1, 1], degree=2))
        make_face(mode=Mode.SUBTRACT)
        Polygon((21.4873852523, 5.0503055357), (17.1196023424, 5.0503055357), (17.1196023424, -6.2545443488), (15.4048217419, -6.2545443488), (15.4048217419, 5.0503055357), (11.039925668, 5.0503055357), (11.039925668, 6.4561946812), (21.4873852523, 6.4561946812), align=None, mode=Mode.SUBTRACT)
    extrude(amount=-F3_DEPTH, mode=Mode.SUBTRACT)

    # F4 (on face) → F5 (join)
    with BuildSketch(Plane(origin=(0, 0, 0), x_dir=(-1, 0, 0), z_dir=(0, 1, 0))):
        with Locations((8.8527675252, 6.5897610039)):
            Rectangle(F4_W, F4_H)
    extrude(amount=F5_DEPTH)

    # F6
    f6_edges = [f1.edges().sort_by_distance(p)[0] for p in [
        (-8.852768, 5, 13.179522),
        (-6.54064, 5, 6.589761),
        (-8.852768, 5, 0),
        (-11.164895, 5, 6.589761),
    ]]
    fillet(f6_edges, radius=F6_R)

    # F8 (through all)
    with Locations(Plane(origin=(0, 0, 0), x_dir=(1, 0, 0), z_dir=(0, 0, -1))):
        with Locations((-8.9718680829, -1.9239948597)):
            Hole(F8_D / 2)

    # F9 (on face) → F10 (join)
    with BuildSketch(Plane(origin=(0, 0, 0), x_dir=(-1, 0, 0), z_dir=(0, 1, 0))):
        with Locations((0, -17.1873081453)):
            Rectangle(F9_W, F9_H)
    extrude(amount=F10_DEPTH)

    # F11
    f11_edges = [f1.edges().sort_by_distance(p)[0] for p in [
        (0, 5, -15.190486),
        (0, 5, -19.18413),
    ]]
    fillet(f11_edges, radius=F11_R)

    # F12
    f12_edges = [f1.edges().sort_by_distance(p)[0] for p in [
        (16.710437, 5, -17.187308),
        (-16.710437, 5, -17.187308),
    ]]
    fillet(f12_edges, radius=F12_R)


solid = f1.part
